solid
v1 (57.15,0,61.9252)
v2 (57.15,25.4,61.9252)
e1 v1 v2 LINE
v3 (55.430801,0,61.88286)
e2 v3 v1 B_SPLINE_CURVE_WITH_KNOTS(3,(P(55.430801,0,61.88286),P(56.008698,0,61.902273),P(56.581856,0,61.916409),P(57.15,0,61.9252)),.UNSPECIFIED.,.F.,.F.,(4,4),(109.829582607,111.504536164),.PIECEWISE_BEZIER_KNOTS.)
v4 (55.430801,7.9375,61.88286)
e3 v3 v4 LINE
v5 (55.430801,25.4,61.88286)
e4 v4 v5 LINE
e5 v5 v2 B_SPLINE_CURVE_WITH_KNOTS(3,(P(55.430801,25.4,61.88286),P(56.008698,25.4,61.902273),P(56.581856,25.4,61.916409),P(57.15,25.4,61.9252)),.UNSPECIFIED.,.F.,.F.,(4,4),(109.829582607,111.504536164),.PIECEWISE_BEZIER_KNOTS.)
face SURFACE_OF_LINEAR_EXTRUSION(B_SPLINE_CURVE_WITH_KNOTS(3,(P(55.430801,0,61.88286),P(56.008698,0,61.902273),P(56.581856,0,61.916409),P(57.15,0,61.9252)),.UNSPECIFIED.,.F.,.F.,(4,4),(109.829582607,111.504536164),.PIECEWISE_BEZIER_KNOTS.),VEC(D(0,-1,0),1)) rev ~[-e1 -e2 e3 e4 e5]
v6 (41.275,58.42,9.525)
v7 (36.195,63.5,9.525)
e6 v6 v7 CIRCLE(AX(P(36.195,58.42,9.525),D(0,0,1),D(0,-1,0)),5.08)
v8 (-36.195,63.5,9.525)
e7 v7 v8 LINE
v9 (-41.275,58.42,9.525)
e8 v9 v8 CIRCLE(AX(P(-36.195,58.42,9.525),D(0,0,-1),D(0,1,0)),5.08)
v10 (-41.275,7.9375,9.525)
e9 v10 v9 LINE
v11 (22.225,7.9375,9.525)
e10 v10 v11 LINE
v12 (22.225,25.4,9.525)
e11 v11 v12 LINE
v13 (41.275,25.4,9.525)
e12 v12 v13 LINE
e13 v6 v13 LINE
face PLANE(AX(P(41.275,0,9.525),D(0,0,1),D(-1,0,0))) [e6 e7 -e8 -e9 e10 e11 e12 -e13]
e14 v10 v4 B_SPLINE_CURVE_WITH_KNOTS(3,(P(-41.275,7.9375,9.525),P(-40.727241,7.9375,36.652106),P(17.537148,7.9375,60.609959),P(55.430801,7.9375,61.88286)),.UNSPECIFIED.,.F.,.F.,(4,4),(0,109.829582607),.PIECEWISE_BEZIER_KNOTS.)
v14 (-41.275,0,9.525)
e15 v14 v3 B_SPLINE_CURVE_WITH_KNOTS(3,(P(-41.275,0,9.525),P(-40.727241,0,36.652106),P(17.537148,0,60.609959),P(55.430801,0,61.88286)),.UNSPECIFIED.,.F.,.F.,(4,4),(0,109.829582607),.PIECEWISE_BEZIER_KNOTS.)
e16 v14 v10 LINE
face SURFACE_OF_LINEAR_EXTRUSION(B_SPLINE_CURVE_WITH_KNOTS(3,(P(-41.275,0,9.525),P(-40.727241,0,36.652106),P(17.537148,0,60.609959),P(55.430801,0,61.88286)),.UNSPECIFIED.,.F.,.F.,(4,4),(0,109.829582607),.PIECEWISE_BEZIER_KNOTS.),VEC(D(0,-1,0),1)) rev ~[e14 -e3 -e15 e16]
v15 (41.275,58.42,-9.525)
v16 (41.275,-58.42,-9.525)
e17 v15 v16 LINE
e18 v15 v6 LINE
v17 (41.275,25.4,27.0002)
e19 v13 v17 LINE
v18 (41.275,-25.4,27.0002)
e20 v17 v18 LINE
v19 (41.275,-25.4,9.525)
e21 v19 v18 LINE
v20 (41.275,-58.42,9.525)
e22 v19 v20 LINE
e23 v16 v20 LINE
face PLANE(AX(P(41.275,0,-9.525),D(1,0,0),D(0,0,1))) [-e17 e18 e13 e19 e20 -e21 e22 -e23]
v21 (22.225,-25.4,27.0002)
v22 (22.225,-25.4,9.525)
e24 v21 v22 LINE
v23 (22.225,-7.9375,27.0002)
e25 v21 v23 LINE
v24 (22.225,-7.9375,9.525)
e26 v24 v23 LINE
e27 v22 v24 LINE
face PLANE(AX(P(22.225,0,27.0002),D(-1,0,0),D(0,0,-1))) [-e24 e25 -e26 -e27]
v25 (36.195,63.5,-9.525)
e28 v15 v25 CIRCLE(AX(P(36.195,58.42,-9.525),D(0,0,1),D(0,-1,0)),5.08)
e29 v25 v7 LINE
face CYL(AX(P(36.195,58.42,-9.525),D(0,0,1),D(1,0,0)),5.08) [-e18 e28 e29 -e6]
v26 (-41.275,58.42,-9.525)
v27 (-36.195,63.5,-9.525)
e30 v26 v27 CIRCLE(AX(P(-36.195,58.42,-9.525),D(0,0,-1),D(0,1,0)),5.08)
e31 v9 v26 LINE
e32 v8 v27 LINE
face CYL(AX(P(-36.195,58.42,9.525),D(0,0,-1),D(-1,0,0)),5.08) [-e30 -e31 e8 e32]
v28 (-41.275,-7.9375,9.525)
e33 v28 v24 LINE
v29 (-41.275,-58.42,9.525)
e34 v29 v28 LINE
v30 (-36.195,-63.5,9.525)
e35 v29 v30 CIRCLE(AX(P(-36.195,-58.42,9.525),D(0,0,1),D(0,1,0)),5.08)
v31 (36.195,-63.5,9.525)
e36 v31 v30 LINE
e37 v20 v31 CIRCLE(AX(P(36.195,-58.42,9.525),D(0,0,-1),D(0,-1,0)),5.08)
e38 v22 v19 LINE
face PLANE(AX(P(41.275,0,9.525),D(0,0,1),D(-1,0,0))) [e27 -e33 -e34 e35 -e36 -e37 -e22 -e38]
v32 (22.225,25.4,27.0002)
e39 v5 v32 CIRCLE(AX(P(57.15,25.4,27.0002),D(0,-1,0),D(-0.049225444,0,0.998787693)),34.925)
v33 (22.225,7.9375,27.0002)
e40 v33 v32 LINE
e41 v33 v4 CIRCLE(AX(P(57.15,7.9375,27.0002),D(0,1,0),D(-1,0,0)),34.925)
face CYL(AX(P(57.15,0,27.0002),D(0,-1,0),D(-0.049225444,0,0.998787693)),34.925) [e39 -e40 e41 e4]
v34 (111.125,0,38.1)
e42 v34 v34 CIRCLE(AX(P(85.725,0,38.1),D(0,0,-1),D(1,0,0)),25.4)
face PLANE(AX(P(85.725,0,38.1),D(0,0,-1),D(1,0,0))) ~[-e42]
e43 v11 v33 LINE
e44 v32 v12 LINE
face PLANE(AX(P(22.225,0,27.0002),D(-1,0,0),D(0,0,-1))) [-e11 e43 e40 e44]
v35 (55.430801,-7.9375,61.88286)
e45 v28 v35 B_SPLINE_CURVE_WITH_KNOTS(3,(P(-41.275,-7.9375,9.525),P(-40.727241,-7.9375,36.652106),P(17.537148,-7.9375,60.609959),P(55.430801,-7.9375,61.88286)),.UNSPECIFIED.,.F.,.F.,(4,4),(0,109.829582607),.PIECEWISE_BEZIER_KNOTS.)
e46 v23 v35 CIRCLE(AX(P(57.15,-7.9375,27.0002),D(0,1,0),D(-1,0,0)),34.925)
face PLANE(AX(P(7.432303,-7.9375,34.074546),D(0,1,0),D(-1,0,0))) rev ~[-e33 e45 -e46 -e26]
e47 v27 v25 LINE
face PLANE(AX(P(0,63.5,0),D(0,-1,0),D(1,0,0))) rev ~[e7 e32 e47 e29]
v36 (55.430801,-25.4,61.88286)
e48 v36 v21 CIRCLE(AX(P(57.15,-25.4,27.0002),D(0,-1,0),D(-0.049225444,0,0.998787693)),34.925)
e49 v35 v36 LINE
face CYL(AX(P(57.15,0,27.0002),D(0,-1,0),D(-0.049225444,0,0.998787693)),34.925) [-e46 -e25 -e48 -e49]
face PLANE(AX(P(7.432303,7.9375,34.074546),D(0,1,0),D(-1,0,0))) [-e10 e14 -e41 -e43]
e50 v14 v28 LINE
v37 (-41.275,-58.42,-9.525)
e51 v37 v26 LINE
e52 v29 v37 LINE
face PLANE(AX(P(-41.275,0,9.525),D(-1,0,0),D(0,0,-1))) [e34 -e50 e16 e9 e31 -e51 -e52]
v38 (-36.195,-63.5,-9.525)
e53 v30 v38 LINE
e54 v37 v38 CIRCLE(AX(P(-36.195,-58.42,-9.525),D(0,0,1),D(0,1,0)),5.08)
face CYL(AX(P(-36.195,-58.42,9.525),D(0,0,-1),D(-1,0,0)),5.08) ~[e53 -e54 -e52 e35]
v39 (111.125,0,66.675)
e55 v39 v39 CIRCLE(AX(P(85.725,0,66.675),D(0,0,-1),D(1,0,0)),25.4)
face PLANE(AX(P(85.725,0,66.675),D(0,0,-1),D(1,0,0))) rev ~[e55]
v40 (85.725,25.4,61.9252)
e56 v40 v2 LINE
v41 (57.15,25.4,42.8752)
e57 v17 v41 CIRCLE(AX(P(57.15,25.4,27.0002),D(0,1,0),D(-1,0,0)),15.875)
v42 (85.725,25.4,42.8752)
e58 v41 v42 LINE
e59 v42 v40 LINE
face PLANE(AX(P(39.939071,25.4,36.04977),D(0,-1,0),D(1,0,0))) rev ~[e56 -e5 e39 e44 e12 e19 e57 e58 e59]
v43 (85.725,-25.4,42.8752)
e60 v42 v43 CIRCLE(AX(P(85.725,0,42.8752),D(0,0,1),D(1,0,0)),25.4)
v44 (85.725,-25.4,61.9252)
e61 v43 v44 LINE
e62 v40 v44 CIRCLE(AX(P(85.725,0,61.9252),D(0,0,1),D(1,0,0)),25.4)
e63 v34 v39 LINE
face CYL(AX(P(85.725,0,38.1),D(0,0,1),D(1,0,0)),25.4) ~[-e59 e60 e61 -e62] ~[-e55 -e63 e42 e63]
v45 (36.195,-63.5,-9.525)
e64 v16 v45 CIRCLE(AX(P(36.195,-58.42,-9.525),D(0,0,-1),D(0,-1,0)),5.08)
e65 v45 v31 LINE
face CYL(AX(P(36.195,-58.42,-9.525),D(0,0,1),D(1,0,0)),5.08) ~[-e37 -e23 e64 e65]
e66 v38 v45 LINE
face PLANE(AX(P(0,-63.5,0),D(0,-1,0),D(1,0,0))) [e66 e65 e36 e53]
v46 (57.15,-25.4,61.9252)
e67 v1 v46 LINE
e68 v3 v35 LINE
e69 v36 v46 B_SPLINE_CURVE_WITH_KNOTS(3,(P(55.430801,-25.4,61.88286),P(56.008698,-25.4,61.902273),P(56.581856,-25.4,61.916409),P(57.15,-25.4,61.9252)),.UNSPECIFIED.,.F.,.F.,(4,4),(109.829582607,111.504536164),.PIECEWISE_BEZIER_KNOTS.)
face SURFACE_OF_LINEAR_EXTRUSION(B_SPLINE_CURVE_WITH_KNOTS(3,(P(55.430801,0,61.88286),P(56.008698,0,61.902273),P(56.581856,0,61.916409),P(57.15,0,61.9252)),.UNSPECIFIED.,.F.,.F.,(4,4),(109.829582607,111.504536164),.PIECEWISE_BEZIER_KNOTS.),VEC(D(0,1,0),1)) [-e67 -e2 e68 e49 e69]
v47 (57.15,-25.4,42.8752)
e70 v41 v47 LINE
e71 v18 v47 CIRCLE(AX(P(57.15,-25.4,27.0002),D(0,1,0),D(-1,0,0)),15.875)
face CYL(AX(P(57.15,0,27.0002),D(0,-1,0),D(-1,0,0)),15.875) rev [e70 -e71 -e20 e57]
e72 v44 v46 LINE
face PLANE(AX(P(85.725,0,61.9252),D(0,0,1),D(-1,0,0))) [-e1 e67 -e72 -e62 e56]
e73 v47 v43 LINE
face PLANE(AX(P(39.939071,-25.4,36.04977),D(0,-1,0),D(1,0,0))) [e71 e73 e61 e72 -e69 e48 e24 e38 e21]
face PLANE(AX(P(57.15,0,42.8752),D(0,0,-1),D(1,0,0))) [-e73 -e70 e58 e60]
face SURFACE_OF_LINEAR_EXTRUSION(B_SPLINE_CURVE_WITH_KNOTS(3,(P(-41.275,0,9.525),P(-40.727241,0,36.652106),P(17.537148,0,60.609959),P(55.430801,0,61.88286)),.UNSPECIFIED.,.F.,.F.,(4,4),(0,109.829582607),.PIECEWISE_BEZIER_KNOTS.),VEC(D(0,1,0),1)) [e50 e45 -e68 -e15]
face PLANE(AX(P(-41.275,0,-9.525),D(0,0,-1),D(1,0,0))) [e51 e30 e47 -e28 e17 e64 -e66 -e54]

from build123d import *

# Parameters (mm, degrees)
F1_DEPTH = 63.5
F0_W     = 25.4
F0_H     = 19.05
F2_DEPTH = 25.4
F3_DEPTH = 7.9375
F5_R     = 5.08


# Not quite as in the source:
# - ends of sketch curves that miss each other by under 0.0002 mm in the source are joined


with BuildPart() as f1:
    # F0 (on Front) → F1 (new body, symmetric)
    with BuildSketch(Plane.XZ):
        Polygon((-41.275, -9.525), (41.275, -9.525), (41.275, 9.525), (22.225, 9.525), (-41.275, 9.525), align=None)
    extrude(amount=F1_DEPTH, both=True)

    # F0 (on Front) → F2 (join, symmetric)
    with BuildSketch(Plane.XZ):
        with BuildLine():
            Line((22.225, 9.525), (41.275, 9.525))
            Line((41.275, 9.525), (41.275, 27.0002))
            ThreePointArc((41.275, 27.0002), (45.9246798487, 38.2255201513), (57.15, 42.8752))
            Line((57.15, 42.8752), (60.325, 42.8752))
            Line((60.325, 42.8752), (60.325, 61.9252))
            Line((60.325, 61.9252), (57.15, 61.9252))
            add(Edge.make_bspline(
                [(55.4308013552, 61.8828601769), (56.0086976587, 61.9022725241), (56.5818561966, 61.916408872), (57.15, 61.9252)],
                knots=[109.8295826069, 109.8295826069, 109.8295826069, 109.8295826069, 111.5045361635, 111.5045361635, 111.5045361635, 111.5045361635], degree=3))
            ThreePointArc((55.4308013552, 61.8828601769), (31.8537686832, 51.0804056919), (22.225, 27.0002))
            Line((22.225, 27.0002), (22.225, 9.525))
        make_face()
        with Locations((73.025, 52.4002)):
            Rectangle(F0_W, F0_H)
    extrude(amount=F2_DEPTH, both=True)

    # F0 (on Front) → F3 (join, symmetric)
    with BuildSketch(Plane.XZ):
        with BuildLine():
            add(Edge.make_bspline(
                [(-41.275, 9.525), (-40.7272405937, 36.6521064094), (17.5371477958, 60.609959217), (55.4308013552, 61.8828601769)],
                knots=[0, 0, 0, 0, 109.8295826069, 109.8295826069, 109.8295826069, 109.8295826069], degree=3))
            Line((-41.275, 9.525), (22.225, 9.525))
            Line((22.225, 9.525), (22.225, 27.0002))
            ThreePointArc((22.225, 27.0002), (31.8537686832, 51.0804056919), (55.4308013552, 61.8828601769))
        make_face()
    extrude(amount=F3_DEPTH, both=True)

    # F0 (on Front) → F4 (revolve)
    with BuildSketch(Plane.XZ):
        Polygon((85.725, 61.9252), (85.725, 42.8752), (85.725, 38.1), (111.125, 38.1), (111.125, 66.675), (85.725, 66.675), align=None)
    revolve(axis=Axis((85.725, 0, 52.3875), (0, 0, -1)))

    # F5
    f5_edges = [f1.edges().sort_by_distance(p)[0] for p in [
        (41.275, -63.5, 0),
        (-41.275, -63.5, 0),
        (-41.275, 63.5, 0),
        (41.275, 63.5, 0),
    ]]
    fillet(f5_edges, radius=F5_R)


solid = f1.part
